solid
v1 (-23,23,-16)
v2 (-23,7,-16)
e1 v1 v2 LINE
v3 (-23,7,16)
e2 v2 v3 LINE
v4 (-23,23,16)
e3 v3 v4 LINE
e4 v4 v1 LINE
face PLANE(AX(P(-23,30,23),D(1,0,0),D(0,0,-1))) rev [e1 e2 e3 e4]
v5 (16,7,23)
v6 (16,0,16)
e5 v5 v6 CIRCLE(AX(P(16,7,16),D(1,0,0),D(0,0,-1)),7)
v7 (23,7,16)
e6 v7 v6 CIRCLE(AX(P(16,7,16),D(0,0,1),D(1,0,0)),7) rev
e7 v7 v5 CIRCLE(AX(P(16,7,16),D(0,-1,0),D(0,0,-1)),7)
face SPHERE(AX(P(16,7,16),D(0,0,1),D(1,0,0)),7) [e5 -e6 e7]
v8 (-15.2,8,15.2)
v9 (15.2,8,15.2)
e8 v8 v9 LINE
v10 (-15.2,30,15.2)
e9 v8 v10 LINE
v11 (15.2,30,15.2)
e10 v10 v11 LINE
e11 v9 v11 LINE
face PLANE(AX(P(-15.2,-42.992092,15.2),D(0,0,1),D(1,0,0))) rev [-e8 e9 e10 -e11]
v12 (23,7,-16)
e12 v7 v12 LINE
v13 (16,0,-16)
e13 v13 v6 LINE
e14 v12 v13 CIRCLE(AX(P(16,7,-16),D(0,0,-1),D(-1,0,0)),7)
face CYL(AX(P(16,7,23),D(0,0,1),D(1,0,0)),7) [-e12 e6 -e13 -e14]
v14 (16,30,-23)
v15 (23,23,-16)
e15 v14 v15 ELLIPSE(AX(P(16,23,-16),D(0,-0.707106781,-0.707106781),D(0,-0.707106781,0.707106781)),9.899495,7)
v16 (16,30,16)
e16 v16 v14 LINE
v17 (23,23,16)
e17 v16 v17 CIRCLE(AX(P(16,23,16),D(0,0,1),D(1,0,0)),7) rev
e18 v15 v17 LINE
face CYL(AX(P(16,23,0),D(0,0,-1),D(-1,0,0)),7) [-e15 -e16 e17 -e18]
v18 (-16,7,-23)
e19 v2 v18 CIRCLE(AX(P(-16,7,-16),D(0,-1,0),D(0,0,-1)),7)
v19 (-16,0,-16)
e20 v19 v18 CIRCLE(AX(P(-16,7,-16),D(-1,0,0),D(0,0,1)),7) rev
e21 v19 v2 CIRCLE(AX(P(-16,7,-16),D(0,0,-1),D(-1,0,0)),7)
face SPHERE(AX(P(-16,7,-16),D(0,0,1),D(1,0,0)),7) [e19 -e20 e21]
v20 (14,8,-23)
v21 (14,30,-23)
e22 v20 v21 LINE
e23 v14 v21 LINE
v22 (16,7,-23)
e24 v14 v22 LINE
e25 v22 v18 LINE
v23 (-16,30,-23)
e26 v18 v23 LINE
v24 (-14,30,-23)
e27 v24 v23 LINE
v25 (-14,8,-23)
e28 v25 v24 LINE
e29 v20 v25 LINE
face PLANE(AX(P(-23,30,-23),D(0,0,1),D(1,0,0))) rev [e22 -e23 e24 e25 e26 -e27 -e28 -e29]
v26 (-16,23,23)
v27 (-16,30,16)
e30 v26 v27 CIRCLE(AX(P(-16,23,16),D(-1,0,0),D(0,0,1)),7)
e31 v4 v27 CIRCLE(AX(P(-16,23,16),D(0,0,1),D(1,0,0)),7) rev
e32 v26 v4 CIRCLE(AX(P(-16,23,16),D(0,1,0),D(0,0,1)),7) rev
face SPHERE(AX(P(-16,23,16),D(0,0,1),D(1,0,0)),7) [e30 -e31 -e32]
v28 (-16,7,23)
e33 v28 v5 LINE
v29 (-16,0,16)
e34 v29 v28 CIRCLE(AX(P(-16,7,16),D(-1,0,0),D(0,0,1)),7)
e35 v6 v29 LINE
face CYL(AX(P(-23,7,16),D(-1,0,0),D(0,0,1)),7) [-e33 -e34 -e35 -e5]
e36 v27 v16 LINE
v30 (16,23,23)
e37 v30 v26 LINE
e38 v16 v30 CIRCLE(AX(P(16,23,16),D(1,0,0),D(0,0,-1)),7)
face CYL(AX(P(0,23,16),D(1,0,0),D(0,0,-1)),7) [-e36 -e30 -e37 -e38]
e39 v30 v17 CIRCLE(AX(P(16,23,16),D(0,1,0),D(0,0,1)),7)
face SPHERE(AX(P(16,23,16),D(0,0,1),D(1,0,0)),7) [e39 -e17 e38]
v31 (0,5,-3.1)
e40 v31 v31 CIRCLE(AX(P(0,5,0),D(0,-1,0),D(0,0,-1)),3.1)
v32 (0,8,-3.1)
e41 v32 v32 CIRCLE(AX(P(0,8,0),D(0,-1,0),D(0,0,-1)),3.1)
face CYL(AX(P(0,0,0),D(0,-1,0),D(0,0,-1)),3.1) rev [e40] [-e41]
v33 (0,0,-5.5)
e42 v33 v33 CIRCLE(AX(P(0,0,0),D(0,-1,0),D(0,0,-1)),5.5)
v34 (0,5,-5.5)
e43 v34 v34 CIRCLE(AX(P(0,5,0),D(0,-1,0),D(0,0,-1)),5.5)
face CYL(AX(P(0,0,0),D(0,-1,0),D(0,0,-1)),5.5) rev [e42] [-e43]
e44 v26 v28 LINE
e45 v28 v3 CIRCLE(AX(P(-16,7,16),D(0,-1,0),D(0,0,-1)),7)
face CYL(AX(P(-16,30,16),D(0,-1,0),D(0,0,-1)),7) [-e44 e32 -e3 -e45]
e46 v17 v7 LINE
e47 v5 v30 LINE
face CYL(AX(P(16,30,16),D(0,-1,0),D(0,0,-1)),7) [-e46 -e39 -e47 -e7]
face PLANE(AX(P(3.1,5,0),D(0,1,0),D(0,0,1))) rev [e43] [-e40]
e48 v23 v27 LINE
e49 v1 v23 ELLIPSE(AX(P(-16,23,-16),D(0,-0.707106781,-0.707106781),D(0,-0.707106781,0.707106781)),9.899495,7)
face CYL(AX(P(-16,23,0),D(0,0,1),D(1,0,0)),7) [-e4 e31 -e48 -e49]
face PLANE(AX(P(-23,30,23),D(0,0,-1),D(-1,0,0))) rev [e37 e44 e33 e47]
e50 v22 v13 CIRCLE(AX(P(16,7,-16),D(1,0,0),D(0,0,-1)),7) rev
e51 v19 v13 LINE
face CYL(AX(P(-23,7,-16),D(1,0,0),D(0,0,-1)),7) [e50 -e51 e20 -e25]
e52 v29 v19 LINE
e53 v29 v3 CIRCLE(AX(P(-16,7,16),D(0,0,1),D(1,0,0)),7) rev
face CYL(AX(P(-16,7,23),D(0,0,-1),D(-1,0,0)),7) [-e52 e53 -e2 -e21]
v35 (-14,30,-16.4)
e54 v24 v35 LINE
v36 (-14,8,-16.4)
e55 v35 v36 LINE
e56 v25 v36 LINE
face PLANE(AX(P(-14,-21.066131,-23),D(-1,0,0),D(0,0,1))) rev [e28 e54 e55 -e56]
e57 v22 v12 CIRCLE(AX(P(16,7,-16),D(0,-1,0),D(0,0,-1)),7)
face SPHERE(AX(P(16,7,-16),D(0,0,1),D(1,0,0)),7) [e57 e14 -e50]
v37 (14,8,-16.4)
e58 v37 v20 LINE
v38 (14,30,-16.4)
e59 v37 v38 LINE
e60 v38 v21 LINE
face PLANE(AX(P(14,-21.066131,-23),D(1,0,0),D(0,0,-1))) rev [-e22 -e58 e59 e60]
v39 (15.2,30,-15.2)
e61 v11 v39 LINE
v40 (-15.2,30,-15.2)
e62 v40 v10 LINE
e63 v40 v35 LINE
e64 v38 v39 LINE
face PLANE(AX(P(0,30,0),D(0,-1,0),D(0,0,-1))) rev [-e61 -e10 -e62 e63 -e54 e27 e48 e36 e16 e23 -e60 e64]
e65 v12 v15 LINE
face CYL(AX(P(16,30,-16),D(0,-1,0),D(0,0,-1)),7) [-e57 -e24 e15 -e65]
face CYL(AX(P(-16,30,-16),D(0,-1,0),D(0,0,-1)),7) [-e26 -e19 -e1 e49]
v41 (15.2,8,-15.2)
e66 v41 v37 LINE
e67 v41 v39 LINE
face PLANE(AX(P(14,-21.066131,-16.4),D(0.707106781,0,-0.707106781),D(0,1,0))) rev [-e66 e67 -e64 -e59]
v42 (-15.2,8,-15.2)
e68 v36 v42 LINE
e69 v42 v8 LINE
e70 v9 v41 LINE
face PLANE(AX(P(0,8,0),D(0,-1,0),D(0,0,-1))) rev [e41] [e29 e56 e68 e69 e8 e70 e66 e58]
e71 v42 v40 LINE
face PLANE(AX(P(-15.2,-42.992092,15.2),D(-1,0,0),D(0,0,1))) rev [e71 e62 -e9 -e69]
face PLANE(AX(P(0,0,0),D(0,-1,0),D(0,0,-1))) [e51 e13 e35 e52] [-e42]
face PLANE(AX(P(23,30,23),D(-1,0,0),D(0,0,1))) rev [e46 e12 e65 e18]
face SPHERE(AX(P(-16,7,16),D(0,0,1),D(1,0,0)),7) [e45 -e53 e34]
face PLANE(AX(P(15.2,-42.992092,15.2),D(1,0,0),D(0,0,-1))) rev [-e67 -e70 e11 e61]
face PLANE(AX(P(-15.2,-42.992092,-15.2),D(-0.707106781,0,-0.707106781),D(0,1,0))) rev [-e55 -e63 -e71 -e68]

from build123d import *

# Parameters (mm, degrees)
SKETCH_1_W                   = 46
SKETCH_1_H                   = 46
EXTRUDE_1_DEPTH              = 30
SKETCH_2_W                   = 30.4
SKETCH_2_H                   = 30.4
CUT_EXTRUDE_1_DEPTH          = 22
SKETCH_3_W                   = 28
SKETCH_3_H                   = 7.8
CUT_EXTRUDE_2_DEPTH          = 22
FILLET_1_R                   = 7
HOLE_WIZARD_M6_1_D           = 6.2
HOLE_WIZARD_M6_1_CBORE_D     = 11
HOLE_WIZARD_M6_1_CBORE_DEPTH = 5
CHAMFER_1_SIZE               = 1.2


with BuildPart() as part:
    # 草图1 → 凸台-拉伸1 (new body)
    with BuildSketch(Plane(origin=(0, 0, 0), x_dir=(1, 0, 0), z_dir=(0, 1, 0))):
        Rectangle(SKETCH_1_W, SKETCH_1_H)
    extrude(amount=EXTRUDE_1_DEPTH)

    # 草图2 → 切除-拉伸1 (cut)
    with BuildSketch(Plane(origin=(0, 30, 0), x_dir=(1, 0, 0), z_dir=(0, 1, 0))):
        Rectangle(SKETCH_2_W, SKETCH_2_H)
    extrude(amount=-CUT_EXTRUDE_1_DEPTH, mode=Mode.SUBTRACT)

    # 草图3 → 切除-拉伸2 (cut)
    with BuildSketch(Plane(origin=(0, 30, 0), x_dir=(1, 0, 0), z_dir=(0, 1, 0))):
        with Locations((0, 19.1)):
            Rectangle(SKETCH_3_W, SKETCH_3_H)
    extrude(amount=-CUT_EXTRUDE_2_DEPTH, mode=Mode.SUBTRACT)

    # 圆角1
    fillet_1_edges = [part.edges().sort_by_distance(p)[0] for p in [
        (-23, 30, 0),
        (0, 30, 23),
        (23, 30, 0),
        (0, 0, 23),
        (-23, 0, 0),
        (0, 0, -23),
        (23, 0, 0),
        (23, 15, 23),
        (-23, 15, 23),
        (-23, 15, -23),
        (23, 15, -23),
    ]]
    fillet(fillet_1_edges, radius=FILLET_1_R)

    # M6 六角头螺钉的柱形沉头孔1 (through all)
    with Locations(Plane(origin=(0, 0, 0), x_dir=(-1, 0, 0), z_dir=(0, -1, 0))):
        with Locations((0, 0)):
            CounterBoreHole(HOLE_WIZARD_M6_1_D / 2, HOLE_WIZARD_M6_1_CBORE_D / 2, HOLE_WIZARD_M6_1_CBORE_DEPTH)

    # 倒角1
    chamfer_1_edges = [part.edges().sort_by_distance(p)[0] for p in [
        (14, 19, -15.2),
        (-14, 19, -15.2),
    ]]
    chamfer(chamfer_1_edges, length=CHAMFER_1_SIZE - 0.0001)  # a hair under: the kernel refuses the full size


solid = part.part
